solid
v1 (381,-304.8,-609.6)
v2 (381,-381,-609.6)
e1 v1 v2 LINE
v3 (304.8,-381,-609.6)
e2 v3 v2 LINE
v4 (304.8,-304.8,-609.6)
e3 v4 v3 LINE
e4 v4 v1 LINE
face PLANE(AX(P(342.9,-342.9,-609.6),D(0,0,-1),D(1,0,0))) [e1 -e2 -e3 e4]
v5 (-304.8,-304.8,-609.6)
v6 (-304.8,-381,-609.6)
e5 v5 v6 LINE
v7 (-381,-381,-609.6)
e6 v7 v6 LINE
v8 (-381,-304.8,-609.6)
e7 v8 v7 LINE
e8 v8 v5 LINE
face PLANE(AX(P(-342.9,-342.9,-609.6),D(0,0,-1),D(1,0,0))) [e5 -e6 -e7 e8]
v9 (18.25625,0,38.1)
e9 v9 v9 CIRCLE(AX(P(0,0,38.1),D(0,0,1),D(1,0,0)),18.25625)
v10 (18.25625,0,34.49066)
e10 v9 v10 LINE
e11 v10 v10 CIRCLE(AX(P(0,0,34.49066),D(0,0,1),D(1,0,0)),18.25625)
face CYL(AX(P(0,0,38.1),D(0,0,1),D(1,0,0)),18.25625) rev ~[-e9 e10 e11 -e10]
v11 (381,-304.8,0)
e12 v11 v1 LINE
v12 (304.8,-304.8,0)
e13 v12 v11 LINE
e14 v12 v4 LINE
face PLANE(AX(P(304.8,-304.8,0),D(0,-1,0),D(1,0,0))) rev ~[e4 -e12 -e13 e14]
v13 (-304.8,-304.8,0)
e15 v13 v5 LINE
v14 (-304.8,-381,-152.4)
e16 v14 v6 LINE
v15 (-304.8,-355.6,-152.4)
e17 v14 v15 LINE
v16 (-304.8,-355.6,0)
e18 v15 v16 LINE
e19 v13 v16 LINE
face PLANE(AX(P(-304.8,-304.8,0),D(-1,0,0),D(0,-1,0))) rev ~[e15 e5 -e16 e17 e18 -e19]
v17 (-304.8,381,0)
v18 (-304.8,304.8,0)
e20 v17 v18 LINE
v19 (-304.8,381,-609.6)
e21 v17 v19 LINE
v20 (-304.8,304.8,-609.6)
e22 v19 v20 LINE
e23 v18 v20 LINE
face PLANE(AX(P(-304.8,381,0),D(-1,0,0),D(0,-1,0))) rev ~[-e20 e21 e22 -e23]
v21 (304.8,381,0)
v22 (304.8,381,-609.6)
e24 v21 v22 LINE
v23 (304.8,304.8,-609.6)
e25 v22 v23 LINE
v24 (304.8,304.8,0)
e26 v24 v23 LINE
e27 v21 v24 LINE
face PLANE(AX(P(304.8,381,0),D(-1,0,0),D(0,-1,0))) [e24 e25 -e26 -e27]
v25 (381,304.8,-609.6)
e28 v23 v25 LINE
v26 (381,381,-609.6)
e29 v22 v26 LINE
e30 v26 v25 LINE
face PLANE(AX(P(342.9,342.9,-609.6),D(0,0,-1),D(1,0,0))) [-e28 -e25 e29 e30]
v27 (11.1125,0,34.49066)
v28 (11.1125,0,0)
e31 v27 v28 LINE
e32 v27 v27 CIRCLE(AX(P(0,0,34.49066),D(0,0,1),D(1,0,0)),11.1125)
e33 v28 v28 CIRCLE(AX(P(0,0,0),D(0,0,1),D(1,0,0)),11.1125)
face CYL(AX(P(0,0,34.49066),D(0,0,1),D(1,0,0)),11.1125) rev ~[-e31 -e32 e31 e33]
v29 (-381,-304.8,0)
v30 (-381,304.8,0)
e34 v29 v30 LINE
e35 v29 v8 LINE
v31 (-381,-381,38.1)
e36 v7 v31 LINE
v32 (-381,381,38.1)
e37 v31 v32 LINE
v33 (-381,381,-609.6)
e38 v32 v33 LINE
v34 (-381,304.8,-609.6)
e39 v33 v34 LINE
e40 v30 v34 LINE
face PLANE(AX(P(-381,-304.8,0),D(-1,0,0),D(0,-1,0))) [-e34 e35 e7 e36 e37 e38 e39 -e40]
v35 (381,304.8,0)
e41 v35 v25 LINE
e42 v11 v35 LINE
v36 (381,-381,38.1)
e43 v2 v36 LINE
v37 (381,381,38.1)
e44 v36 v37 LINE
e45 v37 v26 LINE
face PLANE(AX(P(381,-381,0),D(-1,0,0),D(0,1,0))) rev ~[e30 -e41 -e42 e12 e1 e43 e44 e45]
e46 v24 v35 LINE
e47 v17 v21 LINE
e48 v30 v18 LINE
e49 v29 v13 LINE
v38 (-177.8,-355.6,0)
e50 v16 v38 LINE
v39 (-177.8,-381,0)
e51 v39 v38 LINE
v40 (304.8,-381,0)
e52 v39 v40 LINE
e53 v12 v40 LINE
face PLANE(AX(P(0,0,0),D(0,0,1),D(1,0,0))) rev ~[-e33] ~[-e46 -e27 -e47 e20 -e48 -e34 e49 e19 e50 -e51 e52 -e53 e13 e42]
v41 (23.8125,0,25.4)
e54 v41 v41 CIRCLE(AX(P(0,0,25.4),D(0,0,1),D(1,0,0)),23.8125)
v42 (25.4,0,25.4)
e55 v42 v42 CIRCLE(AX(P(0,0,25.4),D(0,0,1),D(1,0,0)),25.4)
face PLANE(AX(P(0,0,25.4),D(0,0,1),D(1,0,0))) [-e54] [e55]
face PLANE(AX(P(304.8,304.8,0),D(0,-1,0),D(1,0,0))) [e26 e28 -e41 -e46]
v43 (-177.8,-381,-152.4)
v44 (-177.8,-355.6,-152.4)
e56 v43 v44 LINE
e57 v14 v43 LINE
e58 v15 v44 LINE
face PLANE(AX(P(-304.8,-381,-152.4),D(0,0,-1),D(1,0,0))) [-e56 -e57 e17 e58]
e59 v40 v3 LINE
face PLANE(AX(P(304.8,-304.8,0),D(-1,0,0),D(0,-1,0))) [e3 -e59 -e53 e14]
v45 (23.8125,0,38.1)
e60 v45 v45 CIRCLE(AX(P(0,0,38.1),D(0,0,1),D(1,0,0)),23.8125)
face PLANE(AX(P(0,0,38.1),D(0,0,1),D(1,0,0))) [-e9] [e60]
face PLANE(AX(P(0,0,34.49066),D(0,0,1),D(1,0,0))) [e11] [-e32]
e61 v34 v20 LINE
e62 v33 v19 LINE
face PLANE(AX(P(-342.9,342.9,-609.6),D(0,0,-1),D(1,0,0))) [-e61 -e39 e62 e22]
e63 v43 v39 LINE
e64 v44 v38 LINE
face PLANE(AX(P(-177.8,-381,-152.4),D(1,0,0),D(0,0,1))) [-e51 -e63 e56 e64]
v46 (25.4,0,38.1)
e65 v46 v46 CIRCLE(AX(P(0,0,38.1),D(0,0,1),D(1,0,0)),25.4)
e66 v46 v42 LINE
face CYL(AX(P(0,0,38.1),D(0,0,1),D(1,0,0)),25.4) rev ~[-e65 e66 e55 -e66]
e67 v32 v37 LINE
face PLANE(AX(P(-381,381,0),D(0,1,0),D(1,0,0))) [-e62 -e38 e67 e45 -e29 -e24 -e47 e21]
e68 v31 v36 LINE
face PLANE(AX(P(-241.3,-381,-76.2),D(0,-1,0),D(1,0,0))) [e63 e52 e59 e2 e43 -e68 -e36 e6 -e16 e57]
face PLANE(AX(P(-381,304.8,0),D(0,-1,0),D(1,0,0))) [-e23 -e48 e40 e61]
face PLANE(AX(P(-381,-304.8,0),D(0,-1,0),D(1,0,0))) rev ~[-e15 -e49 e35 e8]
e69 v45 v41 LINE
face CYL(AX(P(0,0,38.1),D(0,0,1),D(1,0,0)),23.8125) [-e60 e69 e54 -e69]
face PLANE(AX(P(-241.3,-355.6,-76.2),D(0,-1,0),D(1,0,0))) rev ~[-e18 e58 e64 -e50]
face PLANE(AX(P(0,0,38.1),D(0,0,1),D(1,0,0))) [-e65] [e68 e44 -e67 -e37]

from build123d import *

# Parameters (mm, degrees)
F0_W      = 762
F0_H      = 762
F1_DEPTH  = 38.1
F2_W      = 76.2
F2_H      = 76.2
F3_DEPTH  = 609.6
F4_R      = 18.25625
F5_DEPTH  = 3.60934
F6_R      = 11.1125
F7_DEPTH  = 644.09166
F9_R      = 25.4
F9_R_2    = 23.8125
F10_DEPTH = 12.7
F11_W     = 127
F11_H     = 152.4
F12_DEPTH = 25.4


# Not quite as in the source:
# - a feature of the source that left no trace in its solid (it failed there, or was rolled back) is left out


with BuildPart() as f1:
    # F0 (on Top) → F1 (new body)
    with BuildSketch(Plane.XY):
        Rectangle(F0_W, F0_H)
    extrude(amount=F1_DEPTH)

    # F2 (on face) → F3 (join)
    with BuildSketch(Plane(origin=(0, 0, 0), x_dir=(1, 0, 0), z_dir=(0, 0, -1))):
        with Locations((-342.9, 342.9)):
            Rectangle(F2_W, F2_H)
        with Locations((342.9, 342.9)):
            Rectangle(F2_W, F2_H)
        with Locations((342.9, -342.9)):
            Rectangle(F2_W, F2_H)
        with Locations((-342.9, -342.9)):
            Rectangle(F2_W, F2_H)
    extrude(amount=F3_DEPTH)

    # F4 (on face) → F5 (cut)
    with BuildSketch(Plane.XY.offset(38.1)):
        Circle(F4_R)
    extrude(amount=-F5_DEPTH, mode=Mode.SUBTRACT)

    # F6 (on face) → F7 (cut, through all)
    with BuildSketch(Plane.XY.offset(34.49066)):
        Circle(F6_R)
    extrude(amount=-F7_DEPTH, mode=Mode.SUBTRACT)

    # F9 (on face) → F10 (cut)
    with BuildSketch(Plane.XY.offset(38.1)):
        Circle(F9_R)
        Circle(F9_R_2, mode=Mode.SUBTRACT)
    extrude(amount=-F10_DEPTH, mode=Mode.SUBTRACT)

    # F11 (on face) → F12 (join)
    with BuildSketch(Plane.XZ.offset(381)):
        with Locations((-241.3, -76.2)):
            Rectangle(F11_W, F11_H)
    extrude(amount=-F12_DEPTH)


solid = f1.part
